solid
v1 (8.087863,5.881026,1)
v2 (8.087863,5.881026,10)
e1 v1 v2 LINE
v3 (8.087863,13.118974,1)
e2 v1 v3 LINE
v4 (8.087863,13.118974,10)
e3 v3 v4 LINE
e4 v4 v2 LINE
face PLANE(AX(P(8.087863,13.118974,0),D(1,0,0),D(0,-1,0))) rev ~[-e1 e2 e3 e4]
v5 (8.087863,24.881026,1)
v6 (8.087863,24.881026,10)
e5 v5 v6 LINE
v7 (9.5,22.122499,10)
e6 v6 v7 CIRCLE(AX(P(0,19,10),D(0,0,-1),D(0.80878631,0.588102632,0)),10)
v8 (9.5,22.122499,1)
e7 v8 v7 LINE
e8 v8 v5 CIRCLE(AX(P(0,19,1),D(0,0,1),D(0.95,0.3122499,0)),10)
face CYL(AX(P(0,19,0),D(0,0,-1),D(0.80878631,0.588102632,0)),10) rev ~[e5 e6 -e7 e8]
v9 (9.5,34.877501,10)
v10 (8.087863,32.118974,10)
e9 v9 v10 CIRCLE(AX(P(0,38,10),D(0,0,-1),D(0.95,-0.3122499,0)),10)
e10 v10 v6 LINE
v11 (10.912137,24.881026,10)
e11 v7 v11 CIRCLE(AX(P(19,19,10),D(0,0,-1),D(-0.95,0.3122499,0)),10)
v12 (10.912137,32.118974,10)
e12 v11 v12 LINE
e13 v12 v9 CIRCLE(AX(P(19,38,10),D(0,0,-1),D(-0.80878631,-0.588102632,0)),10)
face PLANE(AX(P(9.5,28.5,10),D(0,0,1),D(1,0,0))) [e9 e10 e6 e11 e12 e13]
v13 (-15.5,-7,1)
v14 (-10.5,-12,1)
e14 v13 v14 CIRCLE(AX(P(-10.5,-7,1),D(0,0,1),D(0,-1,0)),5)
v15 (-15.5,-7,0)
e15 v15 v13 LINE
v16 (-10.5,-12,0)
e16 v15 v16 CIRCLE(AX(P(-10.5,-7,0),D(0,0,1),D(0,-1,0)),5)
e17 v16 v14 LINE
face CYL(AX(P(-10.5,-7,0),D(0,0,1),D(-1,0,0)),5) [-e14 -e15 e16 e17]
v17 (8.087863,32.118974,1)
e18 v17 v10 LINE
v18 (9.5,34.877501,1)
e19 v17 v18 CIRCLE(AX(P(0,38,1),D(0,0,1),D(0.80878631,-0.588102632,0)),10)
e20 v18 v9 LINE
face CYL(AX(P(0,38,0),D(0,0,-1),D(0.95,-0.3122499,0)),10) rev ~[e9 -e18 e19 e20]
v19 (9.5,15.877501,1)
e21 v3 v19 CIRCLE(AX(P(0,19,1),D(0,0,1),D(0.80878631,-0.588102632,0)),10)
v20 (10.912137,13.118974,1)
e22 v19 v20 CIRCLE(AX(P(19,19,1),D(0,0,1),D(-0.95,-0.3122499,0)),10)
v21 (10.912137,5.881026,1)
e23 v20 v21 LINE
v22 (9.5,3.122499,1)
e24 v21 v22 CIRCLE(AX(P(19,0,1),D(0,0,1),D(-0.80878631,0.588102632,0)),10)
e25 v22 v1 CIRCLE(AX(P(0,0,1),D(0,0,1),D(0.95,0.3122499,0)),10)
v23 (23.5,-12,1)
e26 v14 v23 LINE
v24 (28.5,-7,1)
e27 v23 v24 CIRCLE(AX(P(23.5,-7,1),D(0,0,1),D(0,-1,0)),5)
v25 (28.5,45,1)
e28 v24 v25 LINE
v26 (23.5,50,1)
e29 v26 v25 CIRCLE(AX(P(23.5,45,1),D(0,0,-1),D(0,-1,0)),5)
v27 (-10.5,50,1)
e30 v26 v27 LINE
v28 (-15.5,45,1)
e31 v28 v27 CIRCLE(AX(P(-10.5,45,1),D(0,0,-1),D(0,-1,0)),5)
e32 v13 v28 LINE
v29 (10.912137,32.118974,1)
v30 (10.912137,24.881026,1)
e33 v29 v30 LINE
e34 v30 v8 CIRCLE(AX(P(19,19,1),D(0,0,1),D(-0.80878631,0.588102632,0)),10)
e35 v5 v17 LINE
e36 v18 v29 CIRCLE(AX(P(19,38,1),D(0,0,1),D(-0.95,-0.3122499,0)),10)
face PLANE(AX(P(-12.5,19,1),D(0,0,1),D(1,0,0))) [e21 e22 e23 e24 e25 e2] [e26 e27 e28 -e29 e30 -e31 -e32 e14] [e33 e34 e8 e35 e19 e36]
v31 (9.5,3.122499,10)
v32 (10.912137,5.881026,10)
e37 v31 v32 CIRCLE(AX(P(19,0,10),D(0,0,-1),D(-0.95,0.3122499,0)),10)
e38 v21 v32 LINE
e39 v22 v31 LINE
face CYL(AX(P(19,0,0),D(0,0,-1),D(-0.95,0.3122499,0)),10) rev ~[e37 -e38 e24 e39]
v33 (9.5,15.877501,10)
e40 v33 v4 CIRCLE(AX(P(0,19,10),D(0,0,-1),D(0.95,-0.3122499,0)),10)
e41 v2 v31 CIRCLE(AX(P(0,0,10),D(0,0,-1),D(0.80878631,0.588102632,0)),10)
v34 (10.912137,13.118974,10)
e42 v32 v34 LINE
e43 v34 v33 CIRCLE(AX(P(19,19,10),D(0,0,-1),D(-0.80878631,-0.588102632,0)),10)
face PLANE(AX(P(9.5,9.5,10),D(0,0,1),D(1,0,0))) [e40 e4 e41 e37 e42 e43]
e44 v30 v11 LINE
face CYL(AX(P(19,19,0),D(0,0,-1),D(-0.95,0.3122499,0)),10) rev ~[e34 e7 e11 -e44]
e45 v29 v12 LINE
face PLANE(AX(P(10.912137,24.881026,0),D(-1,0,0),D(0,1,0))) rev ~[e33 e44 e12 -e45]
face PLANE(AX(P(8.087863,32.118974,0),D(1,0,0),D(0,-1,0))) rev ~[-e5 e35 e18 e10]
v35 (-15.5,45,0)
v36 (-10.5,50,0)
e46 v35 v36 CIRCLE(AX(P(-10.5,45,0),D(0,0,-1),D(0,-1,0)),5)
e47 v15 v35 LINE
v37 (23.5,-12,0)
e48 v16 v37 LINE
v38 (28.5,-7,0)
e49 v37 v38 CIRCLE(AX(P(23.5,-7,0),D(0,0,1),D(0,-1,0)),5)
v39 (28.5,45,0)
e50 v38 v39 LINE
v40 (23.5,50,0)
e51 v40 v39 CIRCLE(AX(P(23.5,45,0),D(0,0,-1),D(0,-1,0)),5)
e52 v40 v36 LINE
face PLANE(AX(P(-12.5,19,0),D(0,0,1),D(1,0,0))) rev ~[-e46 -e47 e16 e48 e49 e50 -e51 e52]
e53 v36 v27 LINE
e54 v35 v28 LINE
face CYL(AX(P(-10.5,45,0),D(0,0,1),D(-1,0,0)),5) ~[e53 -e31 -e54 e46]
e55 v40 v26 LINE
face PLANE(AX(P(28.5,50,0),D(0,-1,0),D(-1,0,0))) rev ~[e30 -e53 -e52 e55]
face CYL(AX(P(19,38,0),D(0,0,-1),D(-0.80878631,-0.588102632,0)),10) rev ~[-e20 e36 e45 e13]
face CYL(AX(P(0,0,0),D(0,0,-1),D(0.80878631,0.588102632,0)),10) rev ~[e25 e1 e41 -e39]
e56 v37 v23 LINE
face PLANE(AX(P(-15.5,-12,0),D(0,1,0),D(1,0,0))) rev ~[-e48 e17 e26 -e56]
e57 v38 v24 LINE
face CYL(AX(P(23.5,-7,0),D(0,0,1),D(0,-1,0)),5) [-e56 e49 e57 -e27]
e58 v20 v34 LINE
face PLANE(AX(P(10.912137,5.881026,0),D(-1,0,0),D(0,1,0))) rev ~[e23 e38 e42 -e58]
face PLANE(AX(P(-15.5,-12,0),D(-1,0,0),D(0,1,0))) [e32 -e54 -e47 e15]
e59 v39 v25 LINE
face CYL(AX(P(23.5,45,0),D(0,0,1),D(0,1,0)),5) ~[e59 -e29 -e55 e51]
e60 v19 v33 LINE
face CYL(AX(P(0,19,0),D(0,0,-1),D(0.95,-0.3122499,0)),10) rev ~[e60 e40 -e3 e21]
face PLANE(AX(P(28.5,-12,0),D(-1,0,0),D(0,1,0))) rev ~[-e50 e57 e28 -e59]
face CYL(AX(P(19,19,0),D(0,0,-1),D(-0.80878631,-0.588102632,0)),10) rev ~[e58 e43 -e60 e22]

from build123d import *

# Parameters (mm, degrees)
F0_W     = 6
F0_H     = 62
F0_W_2   = 38
F1_DEPTH = 1
F2_DEPTH = 10
F3_R     = 5


# Not quite as in the source:
# - a feature names something its author has since deleted; it is built from what else it names


with BuildPart() as f1:
    # F0 (on Top) → F1 (new body)
    with BuildSketch(Plane.XY):
        with Locations((-12.5, 19)):
            Rectangle(F0_W, F0_H)
        with Locations((9.5, 19)):
            Rectangle(F0_W_2, F0_H)
        with BuildLine():
            ThreePointArc((9.5, 15.8775010008), (10.0985618966, 14.4432029131), (10.9121369044, 13.1189736826))
            Line((10.9121369044, 13.1189736826), (10.9121369044, 5.8810263174))
            ThreePointArc((10.9121369044, 5.8810263174), (10.0985618966, 4.5567970869), (9.5, 3.1224989992))
            ThreePointArc((9.5, 3.1224989992), (8.9014381034, 4.5567970869), (8.0878630956, 5.8810263174))
            Line((8.0878630956, 5.8810263174), (8.0878630956, 13.1189736826))
            ThreePointArc((8.0878630956, 13.1189736826), (8.9014381034, 14.4432029131), (9.5, 15.8775010008))
        make_face(mode=Mode.SUBTRACT)
        with BuildLine():
            Line((8.0878630956, 24.8810263174), (8.0878630956, 32.1189736826))
            ThreePointArc((8.0878630956, 32.1189736826), (8.9014381034, 33.4432029131), (9.5, 34.8775010008))
            ThreePointArc((9.5, 34.8775010008), (10.0985618966, 33.4432029131), (10.9121369044, 32.1189736826))
            Line((10.9121369044, 32.1189736826), (10.9121369044, 24.8810263174))
            ThreePointArc((10.9121369044, 24.8810263174), (10.0985618966, 23.5567970869), (9.5, 22.1224989992))
            ThreePointArc((9.5, 22.1224989992), (8.9014381034, 23.5567970869), (8.0878630956, 24.8810263174))
        make_face(mode=Mode.SUBTRACT)
    extrude(amount=F1_DEPTH)

    # F0 (on Top) → F2 (join)
    with BuildSketch(Plane.XY):
        with BuildLine():
            ThreePointArc((9.5, 34.8775010008), (8.9014381034, 33.4432029131), (8.0878630956, 32.1189736826))
            Line((8.0878630956, 32.1189736826), (8.0878630956, 24.8810263174))
            ThreePointArc((8.0878630956, 24.8810263174), (8.9014381034, 23.5567970869), (9.5, 22.1224989992))
            ThreePointArc((9.5, 22.1224989992), (10.0985618966, 23.5567970869), (10.9121369044, 24.8810263174))
            Line((10.9121369044, 24.8810263174), (10.9121369044, 32.1189736826))
            ThreePointArc((10.9121369044, 32.1189736826), (10.0985618966, 33.4432029131), (9.5, 34.8775010008))
        make_face()
        with BuildLine():
            Line((10.9121369044, 5.8810263174), (10.9121369044, 13.1189736826))
            ThreePointArc((10.9121369044, 13.1189736826), (10.0985618966, 14.4432029131), (9.5, 15.8775010008))
            ThreePointArc((9.5, 15.8775010008), (8.9014381034, 14.4432029131), (8.0878630956, 13.1189736826))
            Line((8.0878630956, 13.1189736826), (8.0878630956, 5.8810263174))
            ThreePointArc((8.0878630956, 5.8810263174), (8.9014381034, 4.5567970869), (9.5, 3.1224989992))
            ThreePointArc((9.5, 3.1224989992), (10.0985618966, 4.5567970869), (10.9121369044, 5.8810263174))
        make_face()
    extrude(amount=F2_DEPTH)

    # F3
    f3_edges = [f1.edges().sort_by_distance(p)[0] for p in [
        (-15.5, 50, 0.5),
        (28.5, 50, 0.5),
        (28.5, -12, 0.5),
        (-15.5, -12, 0.5),
    ]]
    fillet(f3_edges, radius=F3_R)


solid = f1.part
